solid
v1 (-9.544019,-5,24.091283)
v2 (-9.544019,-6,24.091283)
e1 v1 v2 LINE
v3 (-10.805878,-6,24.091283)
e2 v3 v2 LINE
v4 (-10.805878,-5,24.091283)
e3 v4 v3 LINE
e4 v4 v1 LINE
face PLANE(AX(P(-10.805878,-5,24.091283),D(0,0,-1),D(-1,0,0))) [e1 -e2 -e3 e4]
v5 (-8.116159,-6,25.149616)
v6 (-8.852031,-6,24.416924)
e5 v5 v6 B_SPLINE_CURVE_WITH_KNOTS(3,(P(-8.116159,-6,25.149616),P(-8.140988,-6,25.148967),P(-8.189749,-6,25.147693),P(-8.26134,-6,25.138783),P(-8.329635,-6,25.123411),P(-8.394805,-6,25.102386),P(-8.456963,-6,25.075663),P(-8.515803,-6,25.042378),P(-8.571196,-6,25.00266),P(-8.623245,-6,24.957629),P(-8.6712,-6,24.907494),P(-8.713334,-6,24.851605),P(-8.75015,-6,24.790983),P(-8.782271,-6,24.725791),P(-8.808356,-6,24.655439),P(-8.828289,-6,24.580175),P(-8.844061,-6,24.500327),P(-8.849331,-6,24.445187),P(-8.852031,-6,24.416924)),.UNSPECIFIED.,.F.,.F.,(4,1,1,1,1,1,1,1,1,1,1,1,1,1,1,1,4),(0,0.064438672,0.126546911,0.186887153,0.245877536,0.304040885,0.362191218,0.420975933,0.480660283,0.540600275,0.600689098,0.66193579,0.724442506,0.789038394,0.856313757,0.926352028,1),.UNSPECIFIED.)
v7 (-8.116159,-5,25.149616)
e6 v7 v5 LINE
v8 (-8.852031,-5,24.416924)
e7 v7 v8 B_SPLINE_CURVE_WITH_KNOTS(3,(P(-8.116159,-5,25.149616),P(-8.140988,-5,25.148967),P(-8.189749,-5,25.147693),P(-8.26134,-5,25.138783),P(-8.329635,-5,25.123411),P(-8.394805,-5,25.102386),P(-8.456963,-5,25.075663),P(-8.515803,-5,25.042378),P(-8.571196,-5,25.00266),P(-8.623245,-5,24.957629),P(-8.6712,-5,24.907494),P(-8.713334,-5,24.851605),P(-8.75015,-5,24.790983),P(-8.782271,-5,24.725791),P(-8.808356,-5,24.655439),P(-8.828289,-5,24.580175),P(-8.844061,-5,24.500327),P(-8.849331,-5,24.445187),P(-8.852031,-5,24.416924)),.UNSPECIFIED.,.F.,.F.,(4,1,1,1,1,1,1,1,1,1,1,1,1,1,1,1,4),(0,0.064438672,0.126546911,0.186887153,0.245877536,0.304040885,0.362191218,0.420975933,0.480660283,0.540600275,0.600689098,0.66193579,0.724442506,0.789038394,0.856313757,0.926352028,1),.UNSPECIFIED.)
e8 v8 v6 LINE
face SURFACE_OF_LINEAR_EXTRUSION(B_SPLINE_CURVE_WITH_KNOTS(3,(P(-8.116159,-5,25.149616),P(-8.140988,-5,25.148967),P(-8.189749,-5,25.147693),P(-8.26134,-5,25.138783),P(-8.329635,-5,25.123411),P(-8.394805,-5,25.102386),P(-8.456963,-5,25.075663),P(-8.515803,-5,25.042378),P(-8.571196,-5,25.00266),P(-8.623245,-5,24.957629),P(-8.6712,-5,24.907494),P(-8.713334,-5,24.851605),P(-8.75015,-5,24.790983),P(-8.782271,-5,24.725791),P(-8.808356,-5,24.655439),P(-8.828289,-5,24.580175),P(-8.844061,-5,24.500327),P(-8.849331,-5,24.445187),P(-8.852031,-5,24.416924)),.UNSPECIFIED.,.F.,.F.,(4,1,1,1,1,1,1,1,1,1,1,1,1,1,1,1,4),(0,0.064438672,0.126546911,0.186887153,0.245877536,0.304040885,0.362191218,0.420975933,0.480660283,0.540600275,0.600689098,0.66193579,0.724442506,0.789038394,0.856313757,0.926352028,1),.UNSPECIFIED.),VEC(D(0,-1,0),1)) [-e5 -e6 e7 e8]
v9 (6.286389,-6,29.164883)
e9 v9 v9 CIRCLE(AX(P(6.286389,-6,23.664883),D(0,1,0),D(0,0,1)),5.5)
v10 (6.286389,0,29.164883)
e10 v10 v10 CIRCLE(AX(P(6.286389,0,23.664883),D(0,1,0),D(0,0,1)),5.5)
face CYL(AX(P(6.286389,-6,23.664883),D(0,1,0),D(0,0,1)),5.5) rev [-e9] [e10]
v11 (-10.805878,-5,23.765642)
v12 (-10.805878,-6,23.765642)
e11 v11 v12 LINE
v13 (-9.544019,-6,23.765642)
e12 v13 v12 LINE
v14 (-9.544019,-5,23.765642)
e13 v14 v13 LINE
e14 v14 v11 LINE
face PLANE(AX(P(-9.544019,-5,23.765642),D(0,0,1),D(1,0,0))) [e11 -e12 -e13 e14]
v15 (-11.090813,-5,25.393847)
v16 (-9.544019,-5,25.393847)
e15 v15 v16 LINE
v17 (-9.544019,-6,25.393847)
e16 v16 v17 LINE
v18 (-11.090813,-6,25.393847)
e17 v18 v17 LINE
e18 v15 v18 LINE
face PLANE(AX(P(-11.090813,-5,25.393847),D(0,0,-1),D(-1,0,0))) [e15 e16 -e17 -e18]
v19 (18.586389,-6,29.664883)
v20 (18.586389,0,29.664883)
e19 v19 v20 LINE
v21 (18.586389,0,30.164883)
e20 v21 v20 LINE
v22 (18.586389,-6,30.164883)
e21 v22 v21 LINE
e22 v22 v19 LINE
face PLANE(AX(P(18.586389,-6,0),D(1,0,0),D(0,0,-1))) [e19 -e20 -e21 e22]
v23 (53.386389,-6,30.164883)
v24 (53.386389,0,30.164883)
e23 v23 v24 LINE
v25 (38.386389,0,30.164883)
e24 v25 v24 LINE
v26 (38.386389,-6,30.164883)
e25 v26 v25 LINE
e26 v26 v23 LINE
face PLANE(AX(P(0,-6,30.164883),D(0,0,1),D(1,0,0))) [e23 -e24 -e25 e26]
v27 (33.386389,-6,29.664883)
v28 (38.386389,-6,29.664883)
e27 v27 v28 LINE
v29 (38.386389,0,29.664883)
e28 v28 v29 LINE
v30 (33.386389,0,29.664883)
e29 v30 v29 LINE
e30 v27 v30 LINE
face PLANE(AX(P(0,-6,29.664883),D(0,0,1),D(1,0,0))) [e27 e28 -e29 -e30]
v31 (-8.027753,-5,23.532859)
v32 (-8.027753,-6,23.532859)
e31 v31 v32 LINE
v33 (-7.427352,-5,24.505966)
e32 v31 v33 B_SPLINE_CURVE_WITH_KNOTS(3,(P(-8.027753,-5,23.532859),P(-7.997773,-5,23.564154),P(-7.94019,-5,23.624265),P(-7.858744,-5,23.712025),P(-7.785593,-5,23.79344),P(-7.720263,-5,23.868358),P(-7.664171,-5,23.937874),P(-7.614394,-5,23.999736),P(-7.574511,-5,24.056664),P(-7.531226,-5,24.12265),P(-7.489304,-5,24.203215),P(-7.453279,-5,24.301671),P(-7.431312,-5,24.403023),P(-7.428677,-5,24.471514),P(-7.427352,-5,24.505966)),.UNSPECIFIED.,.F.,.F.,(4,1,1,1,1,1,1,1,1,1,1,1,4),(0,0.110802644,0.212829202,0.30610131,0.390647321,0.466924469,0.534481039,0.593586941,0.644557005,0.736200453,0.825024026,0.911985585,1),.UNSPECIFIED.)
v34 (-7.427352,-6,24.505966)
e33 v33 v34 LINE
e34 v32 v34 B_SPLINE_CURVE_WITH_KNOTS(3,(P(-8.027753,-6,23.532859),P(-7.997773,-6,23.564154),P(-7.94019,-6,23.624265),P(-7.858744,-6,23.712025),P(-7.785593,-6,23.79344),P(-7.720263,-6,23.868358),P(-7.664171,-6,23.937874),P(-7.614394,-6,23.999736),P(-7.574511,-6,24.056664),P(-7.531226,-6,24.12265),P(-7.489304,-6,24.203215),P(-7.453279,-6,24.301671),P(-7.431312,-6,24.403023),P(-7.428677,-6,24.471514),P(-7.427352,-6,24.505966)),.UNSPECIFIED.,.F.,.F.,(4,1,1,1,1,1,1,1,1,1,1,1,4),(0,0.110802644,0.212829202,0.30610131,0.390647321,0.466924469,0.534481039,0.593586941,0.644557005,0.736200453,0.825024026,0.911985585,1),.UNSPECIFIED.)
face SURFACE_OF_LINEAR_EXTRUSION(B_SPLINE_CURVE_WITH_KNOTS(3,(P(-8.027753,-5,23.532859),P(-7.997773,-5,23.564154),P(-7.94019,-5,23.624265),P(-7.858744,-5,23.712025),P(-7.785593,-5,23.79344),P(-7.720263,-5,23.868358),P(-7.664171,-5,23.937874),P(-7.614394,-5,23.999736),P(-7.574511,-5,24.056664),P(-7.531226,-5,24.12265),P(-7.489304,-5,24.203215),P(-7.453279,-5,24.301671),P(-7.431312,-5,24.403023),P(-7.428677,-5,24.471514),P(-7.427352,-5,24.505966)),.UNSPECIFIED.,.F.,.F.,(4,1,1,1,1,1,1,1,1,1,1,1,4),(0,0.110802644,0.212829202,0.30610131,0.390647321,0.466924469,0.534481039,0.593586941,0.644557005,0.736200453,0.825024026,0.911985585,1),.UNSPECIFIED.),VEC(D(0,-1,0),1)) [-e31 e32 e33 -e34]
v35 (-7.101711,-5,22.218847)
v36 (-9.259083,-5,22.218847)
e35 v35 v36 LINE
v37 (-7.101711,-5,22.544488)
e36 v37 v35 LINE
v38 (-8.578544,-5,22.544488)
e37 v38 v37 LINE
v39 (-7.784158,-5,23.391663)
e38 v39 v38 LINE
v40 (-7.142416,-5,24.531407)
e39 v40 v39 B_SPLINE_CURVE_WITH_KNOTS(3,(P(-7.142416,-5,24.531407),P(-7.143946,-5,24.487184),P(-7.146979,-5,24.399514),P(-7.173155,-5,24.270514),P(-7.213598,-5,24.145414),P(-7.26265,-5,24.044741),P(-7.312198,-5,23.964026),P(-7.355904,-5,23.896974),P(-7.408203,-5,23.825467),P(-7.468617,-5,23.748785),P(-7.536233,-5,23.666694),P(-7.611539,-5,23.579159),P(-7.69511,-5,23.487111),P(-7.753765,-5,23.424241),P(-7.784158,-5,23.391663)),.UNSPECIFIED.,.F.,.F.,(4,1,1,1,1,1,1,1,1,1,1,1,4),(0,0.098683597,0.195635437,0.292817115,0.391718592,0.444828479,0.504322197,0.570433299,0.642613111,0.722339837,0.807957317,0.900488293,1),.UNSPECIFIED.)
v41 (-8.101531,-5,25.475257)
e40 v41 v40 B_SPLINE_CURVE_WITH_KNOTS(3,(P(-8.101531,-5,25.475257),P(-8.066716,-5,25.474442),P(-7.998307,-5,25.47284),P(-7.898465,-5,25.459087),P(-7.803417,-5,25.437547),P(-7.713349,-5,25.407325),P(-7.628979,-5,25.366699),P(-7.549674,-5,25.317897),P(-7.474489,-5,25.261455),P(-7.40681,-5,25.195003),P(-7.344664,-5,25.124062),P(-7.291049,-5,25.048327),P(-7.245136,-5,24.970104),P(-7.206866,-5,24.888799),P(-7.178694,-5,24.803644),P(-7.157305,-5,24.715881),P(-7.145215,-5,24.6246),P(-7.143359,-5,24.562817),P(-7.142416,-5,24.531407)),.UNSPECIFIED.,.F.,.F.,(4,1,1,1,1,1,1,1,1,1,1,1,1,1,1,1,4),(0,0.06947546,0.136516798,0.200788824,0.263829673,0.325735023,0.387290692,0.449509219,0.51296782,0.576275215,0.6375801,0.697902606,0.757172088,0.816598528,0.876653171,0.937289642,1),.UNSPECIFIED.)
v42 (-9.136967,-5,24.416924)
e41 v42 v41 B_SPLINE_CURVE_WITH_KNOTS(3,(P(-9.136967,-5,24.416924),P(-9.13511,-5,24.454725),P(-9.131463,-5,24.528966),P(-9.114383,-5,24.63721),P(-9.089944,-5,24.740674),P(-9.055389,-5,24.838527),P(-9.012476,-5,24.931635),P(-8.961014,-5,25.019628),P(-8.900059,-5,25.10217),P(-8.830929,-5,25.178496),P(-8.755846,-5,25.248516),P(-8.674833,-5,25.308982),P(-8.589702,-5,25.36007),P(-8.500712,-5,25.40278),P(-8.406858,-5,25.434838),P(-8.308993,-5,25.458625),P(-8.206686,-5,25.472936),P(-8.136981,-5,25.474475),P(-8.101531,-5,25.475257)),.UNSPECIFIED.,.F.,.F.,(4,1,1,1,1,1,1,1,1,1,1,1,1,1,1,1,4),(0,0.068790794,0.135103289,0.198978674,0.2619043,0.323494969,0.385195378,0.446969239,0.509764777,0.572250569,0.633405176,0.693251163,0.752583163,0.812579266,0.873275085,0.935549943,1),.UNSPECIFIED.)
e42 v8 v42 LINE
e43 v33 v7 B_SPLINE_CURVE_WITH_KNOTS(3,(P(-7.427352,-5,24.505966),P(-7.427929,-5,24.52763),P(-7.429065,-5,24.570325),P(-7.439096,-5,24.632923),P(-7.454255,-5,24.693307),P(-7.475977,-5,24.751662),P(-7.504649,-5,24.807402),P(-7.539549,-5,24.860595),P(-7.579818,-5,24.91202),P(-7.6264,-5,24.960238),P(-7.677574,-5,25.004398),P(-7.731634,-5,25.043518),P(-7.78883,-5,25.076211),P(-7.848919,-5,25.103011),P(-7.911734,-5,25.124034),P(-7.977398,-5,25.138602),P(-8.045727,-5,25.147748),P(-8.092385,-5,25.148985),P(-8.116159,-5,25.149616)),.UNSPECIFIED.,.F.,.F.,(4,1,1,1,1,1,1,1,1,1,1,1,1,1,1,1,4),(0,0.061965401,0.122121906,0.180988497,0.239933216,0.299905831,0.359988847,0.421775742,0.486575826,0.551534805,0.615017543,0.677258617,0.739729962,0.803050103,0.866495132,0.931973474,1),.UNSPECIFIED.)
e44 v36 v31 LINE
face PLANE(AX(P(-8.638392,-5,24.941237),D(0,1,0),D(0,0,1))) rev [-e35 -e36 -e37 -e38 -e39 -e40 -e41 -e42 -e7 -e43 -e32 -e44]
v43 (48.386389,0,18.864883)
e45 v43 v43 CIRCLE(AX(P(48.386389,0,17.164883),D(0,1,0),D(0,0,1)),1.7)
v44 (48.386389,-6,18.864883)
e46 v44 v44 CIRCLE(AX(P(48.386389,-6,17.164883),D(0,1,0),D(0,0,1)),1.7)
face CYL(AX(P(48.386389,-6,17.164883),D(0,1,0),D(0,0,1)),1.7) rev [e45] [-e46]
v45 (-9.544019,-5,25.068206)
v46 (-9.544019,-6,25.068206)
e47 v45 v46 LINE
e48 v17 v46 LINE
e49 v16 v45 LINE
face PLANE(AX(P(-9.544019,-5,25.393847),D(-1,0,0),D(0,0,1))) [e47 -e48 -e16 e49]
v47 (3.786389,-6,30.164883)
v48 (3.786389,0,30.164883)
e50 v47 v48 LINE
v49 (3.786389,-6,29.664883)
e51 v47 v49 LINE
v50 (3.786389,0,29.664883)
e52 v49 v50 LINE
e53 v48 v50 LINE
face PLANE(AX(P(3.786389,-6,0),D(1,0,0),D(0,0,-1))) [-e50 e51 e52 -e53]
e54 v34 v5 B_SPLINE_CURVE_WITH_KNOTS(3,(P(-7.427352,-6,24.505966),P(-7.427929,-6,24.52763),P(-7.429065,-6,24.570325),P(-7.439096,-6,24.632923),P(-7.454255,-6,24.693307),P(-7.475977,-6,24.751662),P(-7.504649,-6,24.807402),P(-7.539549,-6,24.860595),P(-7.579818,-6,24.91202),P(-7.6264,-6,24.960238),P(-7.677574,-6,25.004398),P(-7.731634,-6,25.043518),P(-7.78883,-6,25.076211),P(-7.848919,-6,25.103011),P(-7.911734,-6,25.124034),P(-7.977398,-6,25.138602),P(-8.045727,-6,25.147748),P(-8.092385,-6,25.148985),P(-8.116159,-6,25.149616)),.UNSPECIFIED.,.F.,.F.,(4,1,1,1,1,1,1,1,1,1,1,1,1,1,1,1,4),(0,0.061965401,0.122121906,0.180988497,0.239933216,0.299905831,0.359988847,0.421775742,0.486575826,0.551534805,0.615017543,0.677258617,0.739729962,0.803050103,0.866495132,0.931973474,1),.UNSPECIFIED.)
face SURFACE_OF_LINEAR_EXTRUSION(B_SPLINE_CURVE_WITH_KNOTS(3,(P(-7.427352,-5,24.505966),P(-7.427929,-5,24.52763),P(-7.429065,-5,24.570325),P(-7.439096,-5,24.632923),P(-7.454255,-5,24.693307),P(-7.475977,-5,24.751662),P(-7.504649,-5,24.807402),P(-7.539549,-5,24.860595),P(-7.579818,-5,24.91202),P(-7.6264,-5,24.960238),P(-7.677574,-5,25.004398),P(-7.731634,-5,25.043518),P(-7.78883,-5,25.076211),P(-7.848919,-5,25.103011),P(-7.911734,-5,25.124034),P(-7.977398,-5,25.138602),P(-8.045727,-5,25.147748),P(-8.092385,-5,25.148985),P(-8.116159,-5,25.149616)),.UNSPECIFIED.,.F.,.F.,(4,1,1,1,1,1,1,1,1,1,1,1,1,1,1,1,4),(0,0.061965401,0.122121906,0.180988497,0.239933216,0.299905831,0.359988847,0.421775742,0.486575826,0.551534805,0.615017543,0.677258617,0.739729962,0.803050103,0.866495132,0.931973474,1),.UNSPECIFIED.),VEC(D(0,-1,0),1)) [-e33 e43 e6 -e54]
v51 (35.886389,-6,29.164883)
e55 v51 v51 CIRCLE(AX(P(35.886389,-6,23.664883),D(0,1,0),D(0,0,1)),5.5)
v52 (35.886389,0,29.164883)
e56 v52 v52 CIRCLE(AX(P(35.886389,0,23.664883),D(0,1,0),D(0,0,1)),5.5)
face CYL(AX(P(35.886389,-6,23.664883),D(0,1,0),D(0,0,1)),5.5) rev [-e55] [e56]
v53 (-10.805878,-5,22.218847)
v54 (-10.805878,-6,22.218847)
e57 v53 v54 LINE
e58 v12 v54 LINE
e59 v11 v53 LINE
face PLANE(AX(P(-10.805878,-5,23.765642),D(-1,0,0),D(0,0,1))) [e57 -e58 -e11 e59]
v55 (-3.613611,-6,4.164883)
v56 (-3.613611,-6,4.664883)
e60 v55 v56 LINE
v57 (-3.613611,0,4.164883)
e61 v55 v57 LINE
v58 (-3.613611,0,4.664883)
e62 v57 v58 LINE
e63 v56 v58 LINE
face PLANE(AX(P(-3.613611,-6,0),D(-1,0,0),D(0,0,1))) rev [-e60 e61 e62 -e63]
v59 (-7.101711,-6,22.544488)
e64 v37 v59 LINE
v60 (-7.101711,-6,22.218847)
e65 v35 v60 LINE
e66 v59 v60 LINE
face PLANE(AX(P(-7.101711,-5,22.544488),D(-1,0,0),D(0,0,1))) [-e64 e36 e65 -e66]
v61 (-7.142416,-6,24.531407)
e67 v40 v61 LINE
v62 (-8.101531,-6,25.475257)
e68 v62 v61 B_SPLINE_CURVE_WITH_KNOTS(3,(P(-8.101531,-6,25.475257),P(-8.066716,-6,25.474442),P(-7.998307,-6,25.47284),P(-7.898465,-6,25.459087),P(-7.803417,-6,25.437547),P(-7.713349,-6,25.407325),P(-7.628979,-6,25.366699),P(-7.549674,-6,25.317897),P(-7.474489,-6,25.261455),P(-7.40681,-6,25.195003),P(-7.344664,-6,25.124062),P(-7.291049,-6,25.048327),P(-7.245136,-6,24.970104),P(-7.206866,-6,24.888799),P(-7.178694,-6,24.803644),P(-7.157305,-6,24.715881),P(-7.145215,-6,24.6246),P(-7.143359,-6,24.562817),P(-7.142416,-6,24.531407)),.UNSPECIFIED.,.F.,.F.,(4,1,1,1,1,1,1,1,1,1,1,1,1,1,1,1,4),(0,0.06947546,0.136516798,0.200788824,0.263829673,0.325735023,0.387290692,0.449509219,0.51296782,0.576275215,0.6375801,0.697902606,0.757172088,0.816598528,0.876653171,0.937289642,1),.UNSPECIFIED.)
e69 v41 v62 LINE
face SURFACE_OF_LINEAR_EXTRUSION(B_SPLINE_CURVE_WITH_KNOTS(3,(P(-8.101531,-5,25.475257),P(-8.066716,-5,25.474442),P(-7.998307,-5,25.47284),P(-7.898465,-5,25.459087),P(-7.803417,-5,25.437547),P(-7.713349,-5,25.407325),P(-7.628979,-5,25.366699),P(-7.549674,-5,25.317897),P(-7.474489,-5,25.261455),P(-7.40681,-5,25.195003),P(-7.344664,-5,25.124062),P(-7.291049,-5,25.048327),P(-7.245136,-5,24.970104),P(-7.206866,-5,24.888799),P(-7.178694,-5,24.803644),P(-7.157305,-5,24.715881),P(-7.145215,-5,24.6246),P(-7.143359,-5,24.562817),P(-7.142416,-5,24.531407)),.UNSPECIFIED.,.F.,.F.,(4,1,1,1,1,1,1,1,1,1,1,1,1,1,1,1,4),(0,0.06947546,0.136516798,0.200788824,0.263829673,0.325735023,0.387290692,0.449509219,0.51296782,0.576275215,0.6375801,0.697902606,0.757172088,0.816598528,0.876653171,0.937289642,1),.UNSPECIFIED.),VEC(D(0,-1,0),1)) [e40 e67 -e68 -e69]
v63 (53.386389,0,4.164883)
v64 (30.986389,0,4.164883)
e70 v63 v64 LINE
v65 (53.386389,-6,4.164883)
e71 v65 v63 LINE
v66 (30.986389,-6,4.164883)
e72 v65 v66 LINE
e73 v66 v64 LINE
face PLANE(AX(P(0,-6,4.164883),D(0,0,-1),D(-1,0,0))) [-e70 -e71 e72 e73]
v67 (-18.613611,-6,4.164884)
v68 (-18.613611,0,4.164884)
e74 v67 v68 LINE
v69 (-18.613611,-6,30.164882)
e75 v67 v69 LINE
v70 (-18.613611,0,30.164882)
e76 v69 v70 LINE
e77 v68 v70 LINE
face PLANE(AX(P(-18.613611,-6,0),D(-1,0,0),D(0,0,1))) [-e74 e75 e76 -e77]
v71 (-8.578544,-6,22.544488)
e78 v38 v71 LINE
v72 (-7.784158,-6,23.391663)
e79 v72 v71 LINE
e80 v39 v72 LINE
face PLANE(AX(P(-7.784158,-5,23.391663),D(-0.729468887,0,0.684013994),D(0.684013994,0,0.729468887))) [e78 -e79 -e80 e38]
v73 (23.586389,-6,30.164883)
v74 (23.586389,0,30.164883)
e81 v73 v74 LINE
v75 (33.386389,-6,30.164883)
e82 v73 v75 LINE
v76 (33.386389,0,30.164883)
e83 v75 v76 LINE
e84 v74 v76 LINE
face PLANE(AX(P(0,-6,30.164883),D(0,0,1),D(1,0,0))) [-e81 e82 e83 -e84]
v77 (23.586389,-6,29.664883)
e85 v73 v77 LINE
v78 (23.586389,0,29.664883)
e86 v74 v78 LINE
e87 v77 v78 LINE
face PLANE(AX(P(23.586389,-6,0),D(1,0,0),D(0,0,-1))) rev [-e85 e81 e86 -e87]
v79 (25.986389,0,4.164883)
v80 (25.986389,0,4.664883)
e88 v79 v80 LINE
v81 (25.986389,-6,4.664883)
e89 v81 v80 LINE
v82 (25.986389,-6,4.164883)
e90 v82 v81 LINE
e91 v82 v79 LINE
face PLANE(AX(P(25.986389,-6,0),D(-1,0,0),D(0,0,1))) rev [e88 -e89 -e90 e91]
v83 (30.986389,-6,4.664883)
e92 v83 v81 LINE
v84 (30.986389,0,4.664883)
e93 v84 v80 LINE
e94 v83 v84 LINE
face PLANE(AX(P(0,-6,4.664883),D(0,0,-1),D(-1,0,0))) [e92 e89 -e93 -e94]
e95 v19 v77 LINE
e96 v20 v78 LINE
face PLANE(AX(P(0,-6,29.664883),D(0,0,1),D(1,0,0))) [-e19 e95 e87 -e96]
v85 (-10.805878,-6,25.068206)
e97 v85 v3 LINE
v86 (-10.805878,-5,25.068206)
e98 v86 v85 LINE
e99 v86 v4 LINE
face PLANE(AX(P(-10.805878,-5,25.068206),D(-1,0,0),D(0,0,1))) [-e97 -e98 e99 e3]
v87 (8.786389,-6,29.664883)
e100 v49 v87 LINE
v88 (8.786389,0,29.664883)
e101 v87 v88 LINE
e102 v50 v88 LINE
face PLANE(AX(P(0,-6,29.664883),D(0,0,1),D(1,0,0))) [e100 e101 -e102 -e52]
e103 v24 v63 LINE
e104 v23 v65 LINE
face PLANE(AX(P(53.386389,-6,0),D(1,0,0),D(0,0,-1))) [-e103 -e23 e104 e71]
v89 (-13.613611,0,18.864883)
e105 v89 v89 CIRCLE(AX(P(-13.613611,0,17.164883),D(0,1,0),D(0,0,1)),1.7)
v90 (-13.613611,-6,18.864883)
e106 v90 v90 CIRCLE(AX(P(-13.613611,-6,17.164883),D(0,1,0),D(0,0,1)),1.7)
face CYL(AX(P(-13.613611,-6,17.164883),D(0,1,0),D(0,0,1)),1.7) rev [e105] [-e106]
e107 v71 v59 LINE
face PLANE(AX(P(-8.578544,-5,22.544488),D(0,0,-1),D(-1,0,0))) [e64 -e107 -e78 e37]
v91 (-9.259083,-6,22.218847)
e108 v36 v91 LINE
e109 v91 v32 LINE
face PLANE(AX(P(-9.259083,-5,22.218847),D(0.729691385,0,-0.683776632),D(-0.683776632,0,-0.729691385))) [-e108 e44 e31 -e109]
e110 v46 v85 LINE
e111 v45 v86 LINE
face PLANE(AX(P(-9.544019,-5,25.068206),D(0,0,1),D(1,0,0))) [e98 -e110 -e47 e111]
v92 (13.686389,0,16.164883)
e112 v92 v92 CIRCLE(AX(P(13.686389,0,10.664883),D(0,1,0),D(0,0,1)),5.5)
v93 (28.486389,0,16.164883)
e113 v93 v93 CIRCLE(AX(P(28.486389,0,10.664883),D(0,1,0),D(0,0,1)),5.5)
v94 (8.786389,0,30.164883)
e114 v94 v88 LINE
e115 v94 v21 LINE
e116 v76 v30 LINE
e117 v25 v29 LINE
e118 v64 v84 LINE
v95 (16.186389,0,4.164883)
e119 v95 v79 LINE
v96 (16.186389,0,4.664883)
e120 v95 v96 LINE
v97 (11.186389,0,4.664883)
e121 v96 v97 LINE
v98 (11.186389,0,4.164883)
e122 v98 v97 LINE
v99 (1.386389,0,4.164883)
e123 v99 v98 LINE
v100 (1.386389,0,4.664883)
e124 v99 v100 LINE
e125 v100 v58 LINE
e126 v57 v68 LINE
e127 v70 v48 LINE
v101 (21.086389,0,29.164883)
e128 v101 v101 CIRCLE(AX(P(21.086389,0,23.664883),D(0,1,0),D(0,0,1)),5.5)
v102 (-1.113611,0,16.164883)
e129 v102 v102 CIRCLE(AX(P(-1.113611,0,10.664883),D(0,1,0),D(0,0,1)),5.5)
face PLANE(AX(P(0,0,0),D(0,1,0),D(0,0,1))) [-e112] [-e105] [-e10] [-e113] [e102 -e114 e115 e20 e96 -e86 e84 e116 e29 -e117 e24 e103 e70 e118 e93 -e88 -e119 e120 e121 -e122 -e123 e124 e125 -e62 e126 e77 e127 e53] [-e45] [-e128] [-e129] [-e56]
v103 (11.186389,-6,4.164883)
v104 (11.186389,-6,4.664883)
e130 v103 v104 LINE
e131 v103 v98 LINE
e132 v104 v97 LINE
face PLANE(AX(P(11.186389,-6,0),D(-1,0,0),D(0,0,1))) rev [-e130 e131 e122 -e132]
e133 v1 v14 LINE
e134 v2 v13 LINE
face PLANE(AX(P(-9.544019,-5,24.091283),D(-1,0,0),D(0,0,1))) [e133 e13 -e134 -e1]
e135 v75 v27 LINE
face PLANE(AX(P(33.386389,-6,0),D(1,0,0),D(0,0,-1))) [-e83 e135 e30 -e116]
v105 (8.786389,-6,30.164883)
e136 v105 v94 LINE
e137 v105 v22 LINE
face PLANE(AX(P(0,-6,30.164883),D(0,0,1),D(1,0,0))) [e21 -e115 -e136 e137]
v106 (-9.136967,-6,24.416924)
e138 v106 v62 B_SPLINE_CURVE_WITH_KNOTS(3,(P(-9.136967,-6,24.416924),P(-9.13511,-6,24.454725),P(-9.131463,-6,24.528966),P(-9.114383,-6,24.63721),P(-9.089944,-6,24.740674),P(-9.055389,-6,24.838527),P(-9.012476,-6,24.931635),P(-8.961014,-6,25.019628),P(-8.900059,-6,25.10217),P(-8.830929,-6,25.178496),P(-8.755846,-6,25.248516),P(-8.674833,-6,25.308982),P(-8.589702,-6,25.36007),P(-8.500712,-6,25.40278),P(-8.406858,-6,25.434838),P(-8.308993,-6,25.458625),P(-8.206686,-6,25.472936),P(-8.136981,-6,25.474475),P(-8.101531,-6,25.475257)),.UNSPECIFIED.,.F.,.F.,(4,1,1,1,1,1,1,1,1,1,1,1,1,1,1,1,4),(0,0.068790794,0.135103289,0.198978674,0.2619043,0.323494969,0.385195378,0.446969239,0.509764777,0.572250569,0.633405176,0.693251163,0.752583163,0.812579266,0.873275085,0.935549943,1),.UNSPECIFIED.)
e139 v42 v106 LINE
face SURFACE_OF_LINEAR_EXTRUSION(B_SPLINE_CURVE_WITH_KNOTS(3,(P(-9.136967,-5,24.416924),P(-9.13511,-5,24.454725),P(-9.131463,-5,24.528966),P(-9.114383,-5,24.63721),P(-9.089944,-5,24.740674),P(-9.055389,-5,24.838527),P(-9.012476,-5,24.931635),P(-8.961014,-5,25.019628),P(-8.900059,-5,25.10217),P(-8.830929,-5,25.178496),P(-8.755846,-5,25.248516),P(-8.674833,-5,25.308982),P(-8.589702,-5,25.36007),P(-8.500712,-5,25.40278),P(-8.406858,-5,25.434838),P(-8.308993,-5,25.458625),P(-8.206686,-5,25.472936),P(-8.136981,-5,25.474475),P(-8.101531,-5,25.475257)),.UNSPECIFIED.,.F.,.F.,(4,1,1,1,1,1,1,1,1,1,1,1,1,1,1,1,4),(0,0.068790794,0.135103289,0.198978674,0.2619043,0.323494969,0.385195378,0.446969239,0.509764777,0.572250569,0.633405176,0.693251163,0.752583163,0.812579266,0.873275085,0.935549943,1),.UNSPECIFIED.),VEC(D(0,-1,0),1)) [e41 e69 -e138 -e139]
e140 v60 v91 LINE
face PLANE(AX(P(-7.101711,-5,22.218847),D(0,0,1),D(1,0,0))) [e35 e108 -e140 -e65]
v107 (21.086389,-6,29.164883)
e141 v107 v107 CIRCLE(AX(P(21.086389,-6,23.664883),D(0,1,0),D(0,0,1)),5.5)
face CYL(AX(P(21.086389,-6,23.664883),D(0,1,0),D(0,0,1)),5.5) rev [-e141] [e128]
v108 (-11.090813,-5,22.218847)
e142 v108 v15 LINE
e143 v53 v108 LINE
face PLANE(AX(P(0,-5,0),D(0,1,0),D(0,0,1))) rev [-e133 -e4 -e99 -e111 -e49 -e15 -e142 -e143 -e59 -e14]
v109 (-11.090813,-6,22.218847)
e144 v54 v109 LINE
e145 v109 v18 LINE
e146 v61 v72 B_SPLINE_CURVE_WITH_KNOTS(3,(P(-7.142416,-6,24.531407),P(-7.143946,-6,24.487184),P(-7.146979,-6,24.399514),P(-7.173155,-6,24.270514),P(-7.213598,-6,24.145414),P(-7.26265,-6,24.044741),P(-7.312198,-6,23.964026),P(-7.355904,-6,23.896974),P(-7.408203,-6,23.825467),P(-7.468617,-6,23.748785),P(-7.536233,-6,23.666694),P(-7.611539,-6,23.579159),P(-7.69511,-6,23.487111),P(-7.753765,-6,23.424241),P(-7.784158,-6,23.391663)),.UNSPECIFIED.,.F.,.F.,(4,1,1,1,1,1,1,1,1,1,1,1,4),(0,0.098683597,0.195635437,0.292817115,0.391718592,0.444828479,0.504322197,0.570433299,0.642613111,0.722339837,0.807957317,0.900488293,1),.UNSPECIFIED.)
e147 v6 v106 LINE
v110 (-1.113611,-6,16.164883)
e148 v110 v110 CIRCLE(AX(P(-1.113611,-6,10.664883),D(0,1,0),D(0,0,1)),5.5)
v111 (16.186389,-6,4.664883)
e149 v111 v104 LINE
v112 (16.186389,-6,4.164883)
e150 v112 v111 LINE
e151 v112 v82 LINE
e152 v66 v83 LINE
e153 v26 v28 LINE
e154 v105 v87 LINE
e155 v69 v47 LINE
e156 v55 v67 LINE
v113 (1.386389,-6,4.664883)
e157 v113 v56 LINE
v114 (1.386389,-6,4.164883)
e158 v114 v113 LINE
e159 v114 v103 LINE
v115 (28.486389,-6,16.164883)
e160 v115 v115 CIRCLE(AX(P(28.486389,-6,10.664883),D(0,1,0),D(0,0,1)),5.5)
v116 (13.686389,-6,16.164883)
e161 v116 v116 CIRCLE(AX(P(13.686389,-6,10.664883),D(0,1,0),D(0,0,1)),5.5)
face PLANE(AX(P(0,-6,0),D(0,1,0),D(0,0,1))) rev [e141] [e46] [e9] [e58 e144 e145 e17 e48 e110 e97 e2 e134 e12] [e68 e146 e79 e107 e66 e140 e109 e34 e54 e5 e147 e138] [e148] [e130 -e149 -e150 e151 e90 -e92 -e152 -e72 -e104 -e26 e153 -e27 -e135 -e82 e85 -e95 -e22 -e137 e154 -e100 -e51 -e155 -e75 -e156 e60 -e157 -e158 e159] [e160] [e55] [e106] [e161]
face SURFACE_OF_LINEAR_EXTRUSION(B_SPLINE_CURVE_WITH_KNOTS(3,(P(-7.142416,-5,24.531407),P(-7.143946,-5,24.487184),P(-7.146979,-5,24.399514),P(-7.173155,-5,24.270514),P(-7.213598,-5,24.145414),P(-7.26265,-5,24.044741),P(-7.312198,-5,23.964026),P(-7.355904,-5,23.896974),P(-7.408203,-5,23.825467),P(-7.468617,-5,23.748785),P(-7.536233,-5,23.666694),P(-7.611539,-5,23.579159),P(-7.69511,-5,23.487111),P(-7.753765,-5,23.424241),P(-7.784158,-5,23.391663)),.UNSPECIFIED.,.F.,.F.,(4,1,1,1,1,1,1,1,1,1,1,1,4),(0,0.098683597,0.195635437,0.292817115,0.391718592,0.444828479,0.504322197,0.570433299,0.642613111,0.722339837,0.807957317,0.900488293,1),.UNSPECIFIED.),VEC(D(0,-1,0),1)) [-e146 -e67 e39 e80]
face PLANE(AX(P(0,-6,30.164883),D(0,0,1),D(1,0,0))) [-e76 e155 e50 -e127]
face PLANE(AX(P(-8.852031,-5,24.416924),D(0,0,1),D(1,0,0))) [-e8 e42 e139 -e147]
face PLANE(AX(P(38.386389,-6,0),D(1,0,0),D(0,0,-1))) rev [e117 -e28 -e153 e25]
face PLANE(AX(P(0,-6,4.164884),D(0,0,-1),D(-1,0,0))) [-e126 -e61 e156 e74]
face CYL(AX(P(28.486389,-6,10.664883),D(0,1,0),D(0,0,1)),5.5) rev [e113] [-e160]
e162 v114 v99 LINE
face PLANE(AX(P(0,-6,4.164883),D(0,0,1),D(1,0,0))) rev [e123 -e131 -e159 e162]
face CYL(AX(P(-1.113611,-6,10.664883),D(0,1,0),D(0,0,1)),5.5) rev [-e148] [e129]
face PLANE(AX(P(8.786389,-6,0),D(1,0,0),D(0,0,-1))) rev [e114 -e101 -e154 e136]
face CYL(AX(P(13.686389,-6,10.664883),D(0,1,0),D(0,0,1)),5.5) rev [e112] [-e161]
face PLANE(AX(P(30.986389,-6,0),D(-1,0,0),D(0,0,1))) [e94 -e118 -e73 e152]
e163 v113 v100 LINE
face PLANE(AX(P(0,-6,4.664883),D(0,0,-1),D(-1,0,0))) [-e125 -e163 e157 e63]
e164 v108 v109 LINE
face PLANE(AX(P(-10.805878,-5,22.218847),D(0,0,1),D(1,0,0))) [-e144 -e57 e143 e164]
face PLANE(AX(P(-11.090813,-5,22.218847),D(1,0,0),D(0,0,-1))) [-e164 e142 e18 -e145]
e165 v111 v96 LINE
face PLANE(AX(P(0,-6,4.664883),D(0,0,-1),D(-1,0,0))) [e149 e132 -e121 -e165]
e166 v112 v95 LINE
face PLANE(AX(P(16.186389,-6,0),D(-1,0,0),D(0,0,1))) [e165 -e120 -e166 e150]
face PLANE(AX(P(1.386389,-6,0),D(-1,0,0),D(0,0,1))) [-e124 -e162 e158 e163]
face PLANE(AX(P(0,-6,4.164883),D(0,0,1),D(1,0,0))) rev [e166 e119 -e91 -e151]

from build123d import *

# Parameters (mm, degrees)
SKETCH1_W               = 12
SKETCH1_H               = 12
SKETCH1_R               = 5.5
BOSS_EXTRUDE1_DEPTH     = 6
BOSS_EXTRUDE1_2_DEPTH   = 6
BOSS_EXTRUDE1_3_DEPTH   = 6
BOSS_EXTRUDE1_4_DEPTH   = 6
BOSS_EXTRUDE1_5_DEPTH   = 6
BOSS_EXTRUDE1_6_DEPTH   = 6
BOSS_EXTRUDE2_START     = -6
BOSS_EXTRUDE2_OUTLINE_R = 1.7
BOSS_EXTRUDE2_DEPTH     = 6
CUT_EXTRUDE1_DEPTH      = 1


# Read off the part's stored shape, not the designer's step: Boss-Extrude2
with BuildPart() as part:
    # Sketch1 → Boss-Extrude1 (new body)
    with BuildSketch(Plane(origin=(0, 0, 0), x_dir=(1, 0, 0), z_dir=(0, 1, 0))):
        with Locations((13.686388819, -10.664882883)):
            Rectangle(SKETCH1_W, SKETCH1_H)
        with Locations(Location((13.686388819, -10.664882883, 0), (0, 0, 270))):
            Circle(SKETCH1_R, mode=Mode.SUBTRACT)
    extrude(amount=-BOSS_EXTRUDE1_DEPTH)



with BuildPart() as body_2:
    # Sketch1 → Boss-Extrude1 2 (new body)
    with BuildSketch(Plane(origin=(0, 0, 0), x_dir=(1, 0, 0), z_dir=(0, 1, 0))):
        with Locations((-1.113611181, -10.664882883)):
            Rectangle(SKETCH1_W, SKETCH1_H)
        with Locations(Location((-1.113611181, -10.664882883, 0), (0, 0, 270))):
            Circle(SKETCH1_R, mode=Mode.SUBTRACT)
    extrude(amount=-BOSS_EXTRUDE1_2_DEPTH)


with BuildPart() as body_3:
    # Sketch1 → Boss-Extrude1 3 (new body)
    with BuildSketch(Plane(origin=(0, 0, 0), x_dir=(1, 0, 0), z_dir=(0, 1, 0))):
        with Locations((6.28638882, -23.664882883)):
            Rectangle(SKETCH1_W, SKETCH1_H)
        with Locations(Location((6.28638882, -23.664882883, 0), (0, 0, 270))):
            Circle(SKETCH1_R, mode=Mode.SUBTRACT)
    extrude(amount=-BOSS_EXTRUDE1_3_DEPTH)


with BuildPart() as body_4:
    # Sketch1 → Boss-Extrude1 4 (new body)
    with BuildSketch(Plane(origin=(0, 0, 0), x_dir=(1, 0, 0), z_dir=(0, 1, 0))):
        with Locations((21.08638882, -23.664882883)):
            Rectangle(SKETCH1_W, SKETCH1_H)
        with Locations(Location((21.08638882, -23.664882883, 0), (0, 0, 270))):
            Circle(SKETCH1_R, mode=Mode.SUBTRACT)
    extrude(amount=-BOSS_EXTRUDE1_4_DEPTH)


with BuildPart() as body_5:
    # Sketch1 → Boss-Extrude1 5 (new body)
    with BuildSketch(Plane(origin=(0, 0, 0), x_dir=(1, 0, 0), z_dir=(0, 1, 0))):
        with Locations((35.88638882, -23.664882883)):
            Rectangle(SKETCH1_W, SKETCH1_H)
        with Locations(Location((35.88638882, -23.664882883, 0), (0, 0, 270))):
            Circle(SKETCH1_R, mode=Mode.SUBTRACT)
    extrude(amount=-BOSS_EXTRUDE1_5_DEPTH)


with BuildPart() as body_6:
    # Sketch1 → Boss-Extrude1 6 (new body)
    with BuildSketch(Plane(origin=(0, 0, 0), x_dir=(1, 0, 0), z_dir=(0, 1, 0))):
        with Locations((28.486388819, -10.664882883)):
            Rectangle(SKETCH1_W, SKETCH1_H)
        with Locations(Location((28.486388819, -10.664882883, 0), (0, 0, 270))):
            Circle(SKETCH1_R, mode=Mode.SUBTRACT)
    extrude(amount=-BOSS_EXTRUDE1_6_DEPTH)


with BuildPart() as part_1:
    add(part.part)

    add(body_2.part)  # Boss-Extrude2 merges body 2

    add(body_3.part)  # Boss-Extrude2 merges body 3

    add(body_4.part)  # Boss-Extrude2 merges body 4

    add(body_5.part)  # Boss-Extrude2 merges body 5

    add(body_6.part)  # Boss-Extrude2 merges body 6
    # Boss-Extrude2 outline → Boss-Extrude2 (add)
    with BuildSketch(Plane(origin=(0, 0, 0), x_dir=(1, 0, 0), z_dir=(0, 1, 0)).offset(BOSS_EXTRUDE2_START)):
        Polygon((11.186388819, -4.164882883), (1.386388819, -4.164882883), (1.386388819, -4.664882883), (4.886388819, -4.664882883), (4.886388819, -16.664882883), (-7.113611181, -16.664882883), (-7.113611181, -4.664882883), (-3.613611181, -4.664882883), (-3.613611181, -4.164882883), (-18.613611181, -4.164883527), (-18.613611181, -30.164882449), (3.78638882, -30.164882883), (3.78638882, -29.664882883), (0.28638882, -29.664882883), (0.28638882, -17.664882883), (12.28638882, -17.664882883), (12.28638882, -29.664882883), (8.78638882, -29.664882883), (8.78638882, -30.164882883), (18.58638882, -30.164882883), (18.58638882, -29.664882883), (15.08638882, -29.664882883), (15.08638882, -17.664882883), (27.08638882, -17.664882883), (27.08638882, -29.664882883), (23.58638882, -29.664882883), (23.58638882, -30.164882883), (33.38638882, -30.164882883), (33.38638882, -29.664882883), (29.88638882, -29.664882883), (29.88638882, -17.664882883), (41.88638882, -17.664882883), (41.88638882, -29.664882883), (38.38638882, -29.664882883), (38.38638882, -30.164882883), (53.38638882, -30.164882883), (53.38638882, -4.164882883), (30.986388819, -4.164882883), (30.986388819, -4.664882883), (34.486388819, -4.664882883), (34.486388819, -16.664882883), (22.486388819, -16.664882883), (22.486388819, -4.664882883), (25.986388819, -4.664882883), (25.986388819, -4.164882883), (16.186388819, -4.164882883), (16.186388819, -4.664882883), (19.686388819, -4.664882883), (19.686388819, -16.664882883), (7.686388819, -16.664882883), (7.686388819, -4.664882883), (11.186388819, -4.664882883), align=None)
        with Locations((-13.613611181, -17.164882988)):
            Circle(BOSS_EXTRUDE2_OUTLINE_R, mode=Mode.SUBTRACT)
        with Locations((48.386388819, -17.164882988)):
            Circle(BOSS_EXTRUDE2_OUTLINE_R, mode=Mode.SUBTRACT)
    extrude(amount=BOSS_EXTRUDE2_DEPTH)

    # Sketch2 → Cut-Extrude1 (cut)
    with BuildSketch(Plane.XZ.offset(6)):
        Polygon((-11.090813446, 25.393846705), (-9.544018575, 25.393846705), (-9.544018575, 25.068205679), (-10.805877549, 25.068205679), (-10.805877549, 24.091282602), (-9.544018575, 24.091282602), (-9.544018575, 23.765641577), (-10.805877549, 23.765641577), (-10.805877549, 22.218846705), (-11.090813446, 22.218846705), align=None)
        with BuildLine():
            Line((-8.852031395, 24.416923628), (-9.136967293, 24.416923628))
            add(Edge.make_bspline(
                [(-9.136967293, 24.416923628), (-9.135110232, 24.454725076), (-9.131463015, 24.528966114), (-9.114383067, 24.637209944), (-9.089943843, 24.74067394), (-9.055389453, 24.838527362), (-9.012475901, 24.931635423), (-8.961013662, 25.019628294), (-8.90005924, 25.102170301), (-8.830928846, 25.178496252), (-8.755845866, 25.248516405), (-8.674832621, 25.308982233), (-8.589701775, 25.360070406), (-8.500711605, 25.402779818), (-8.406858094, 25.434838107), (-8.30899293, 25.45862488), (-8.206686142, 25.472936279), (-8.136981265, 25.474474599), (-8.101530594, 25.475256961)],
                knots=[0, 0, 0, 0, 1.10065271, 2.161652631, 3.183658789, 4.190468796, 5.17591951, 6.163126047, 7.15150782, 8.156236427, 9.156009102, 10.134482811, 11.092018607, 12.041330605, 13.001268258, 13.972401359, 14.968799086, 16, 16, 16, 16], degree=3))
            add(Edge.make_bspline(
                [(-8.101530594, 25.475256961), (-8.066716198, 25.474441933), (-7.998307154, 25.472840431), (-7.898465184, 25.459087212), (-7.803417209, 25.437546568), (-7.713349021, 25.407324726), (-7.628979234, 25.366698853), (-7.549674044, 25.3178968), (-7.474489308, 25.261454524), (-7.406810297, 25.195002851), (-7.344663683, 25.124062116), (-7.291049494, 25.048326661), (-7.245136124, 24.97010438), (-7.206865872, 24.888798797), (-7.178693517, 24.803644364), (-7.157304714, 24.71588083), (-7.145214846, 24.624599752), (-7.143359355, 24.562817376), (-7.142416011, 24.531406801)],
                knots=[0, 0, 0, 0, 1.111607364, 2.184268762, 3.212621178, 4.221274766, 5.211760367, 6.196651075, 7.1921475, 8.207485113, 9.220403448, 10.201281604, 11.166441695, 12.114753415, 13.065576456, 14.026450734, 14.996634279, 16, 16, 16, 16], degree=3))
            add(Edge.make_bspline(
                [(-7.142416011, 24.531406801), (-7.143946038, 24.48718376), (-7.146979244, 24.399513729), (-7.173155489, 24.270514062), (-7.21359782, 24.145414473), (-7.262649782, 24.044740618), (-7.31219844, 23.964025865), (-7.355904397, 23.896973819), (-7.408203317, 23.825466998), (-7.468616685, 23.748785207), (-7.536233124, 23.666693885), (-7.611539287, 23.579159348), (-7.695110449, 23.487111285), (-7.753764656, 23.424241012), (-7.784157797, 23.391663211)],
                knots=[0, 0, 0, 0, 1.184203166, 2.347625244, 3.513805382, 4.700623107, 5.337941753, 6.051866363, 6.845199593, 7.711357327, 8.668078039, 9.695487809, 10.805859518, 12, 12, 12, 12], degree=3))
            Line((-7.784157797, 23.391663211), (-8.578543815, 22.544487731))
            Line((-8.578543815, 22.544487731), (-7.101710882, 22.544487731))
            Line((-7.101710882, 22.544487731), (-7.101710882, 22.218846705))
            Line((-7.101710882, 22.218846705), (-9.259082677, 22.218846705))
            Line((-9.259082677, 22.218846705), (-8.027752549, 23.532859125))
            add(Edge.make_bspline(
                [(-8.027752549, 23.532859125), (-7.997773395, 23.564154017), (-7.940189574, 23.624265101), (-7.858743951, 23.712024786), (-7.785592869, 23.793440441), (-7.720262805, 23.868358238), (-7.664170983, 23.937874018), (-7.614394029, 23.999736356), (-7.574510957, 24.056663607), (-7.531226277, 24.122649736), (-7.489303594, 24.203215195), (-7.453278814, 24.301670756), (-7.431312487, 24.403023335), (-7.428677386, 24.471514469), (-7.427351908, 24.505966096)],
                knots=[0, 0, 0, 0, 1.329631726, 2.553950428, 3.673215718, 4.687767853, 5.603093632, 6.413772471, 7.123043292, 7.734684054, 8.834405432, 9.900288307, 10.943827018, 12, 12, 12, 12], degree=3))
            add(Edge.make_bspline(
                [(-7.427351908, 24.505966096), (-7.427928617, 24.527629936), (-7.4290652, 24.570325205), (-7.439096111, 24.632923286), (-7.454254927, 24.693307081), (-7.475976697, 24.751662329), (-7.504648526, 24.807402313), (-7.539549378, 24.860594884), (-7.579817506, 24.912019874), (-7.626400444, 24.960237509), (-7.677573751, 25.004398317), (-7.731634249, 25.043518023), (-7.7888297, 25.076210645), (-7.848918954, 25.103010817), (-7.911734487, 25.124034199), (-7.977397792, 25.138601624), (-8.045727435, 25.147747878), (-8.092384963, 25.148985376), (-8.116158999, 25.149615936)],
                knots=[0, 0, 0, 0, 0.991446411, 1.95395049, 2.89581595, 3.838931463, 4.798493298, 5.75982156, 6.748411868, 7.785213223, 8.824556874, 9.840280684, 10.836137867, 11.835679398, 12.848801643, 13.863922112, 14.911575587, 16, 16, 16, 16], degree=3))
            add(Edge.make_bspline(
                [(-8.116158999, 25.149615936), (-8.140988255, 25.148967299), (-8.189748813, 25.147693485), (-8.26133965, 25.138782925), (-8.329634605, 25.123410627), (-8.394805474, 25.102386072), (-8.456962527, 25.07566296), (-8.515803481, 25.042378306), (-8.571196245, 25.002660423), (-8.623244948, 24.957629347), (-8.671200129, 24.907493737), (-8.713334081, 24.851604699), (-8.75014958, 24.790982687), (-8.782270813, 24.725791273), (-8.808356332, 24.655438916), (-8.828289118, 24.580175355), (-8.844061472, 24.500327387), (-8.84933063, 24.445186632), (-8.852031395, 24.416923628)],
                knots=[0, 0, 0, 0, 1.031018746, 2.02475058, 2.990194455, 3.934040569, 4.864654155, 5.795059489, 6.735614925, 7.690564532, 8.649604399, 9.611025574, 10.590972636, 11.591080095, 12.624614302, 13.701020113, 14.821632451, 16, 16, 16, 16], degree=3))
        make_face()
    extrude(amount=-CUT_EXTRUDE1_DEPTH, mode=Mode.SUBTRACT)


solid = part_1.part
